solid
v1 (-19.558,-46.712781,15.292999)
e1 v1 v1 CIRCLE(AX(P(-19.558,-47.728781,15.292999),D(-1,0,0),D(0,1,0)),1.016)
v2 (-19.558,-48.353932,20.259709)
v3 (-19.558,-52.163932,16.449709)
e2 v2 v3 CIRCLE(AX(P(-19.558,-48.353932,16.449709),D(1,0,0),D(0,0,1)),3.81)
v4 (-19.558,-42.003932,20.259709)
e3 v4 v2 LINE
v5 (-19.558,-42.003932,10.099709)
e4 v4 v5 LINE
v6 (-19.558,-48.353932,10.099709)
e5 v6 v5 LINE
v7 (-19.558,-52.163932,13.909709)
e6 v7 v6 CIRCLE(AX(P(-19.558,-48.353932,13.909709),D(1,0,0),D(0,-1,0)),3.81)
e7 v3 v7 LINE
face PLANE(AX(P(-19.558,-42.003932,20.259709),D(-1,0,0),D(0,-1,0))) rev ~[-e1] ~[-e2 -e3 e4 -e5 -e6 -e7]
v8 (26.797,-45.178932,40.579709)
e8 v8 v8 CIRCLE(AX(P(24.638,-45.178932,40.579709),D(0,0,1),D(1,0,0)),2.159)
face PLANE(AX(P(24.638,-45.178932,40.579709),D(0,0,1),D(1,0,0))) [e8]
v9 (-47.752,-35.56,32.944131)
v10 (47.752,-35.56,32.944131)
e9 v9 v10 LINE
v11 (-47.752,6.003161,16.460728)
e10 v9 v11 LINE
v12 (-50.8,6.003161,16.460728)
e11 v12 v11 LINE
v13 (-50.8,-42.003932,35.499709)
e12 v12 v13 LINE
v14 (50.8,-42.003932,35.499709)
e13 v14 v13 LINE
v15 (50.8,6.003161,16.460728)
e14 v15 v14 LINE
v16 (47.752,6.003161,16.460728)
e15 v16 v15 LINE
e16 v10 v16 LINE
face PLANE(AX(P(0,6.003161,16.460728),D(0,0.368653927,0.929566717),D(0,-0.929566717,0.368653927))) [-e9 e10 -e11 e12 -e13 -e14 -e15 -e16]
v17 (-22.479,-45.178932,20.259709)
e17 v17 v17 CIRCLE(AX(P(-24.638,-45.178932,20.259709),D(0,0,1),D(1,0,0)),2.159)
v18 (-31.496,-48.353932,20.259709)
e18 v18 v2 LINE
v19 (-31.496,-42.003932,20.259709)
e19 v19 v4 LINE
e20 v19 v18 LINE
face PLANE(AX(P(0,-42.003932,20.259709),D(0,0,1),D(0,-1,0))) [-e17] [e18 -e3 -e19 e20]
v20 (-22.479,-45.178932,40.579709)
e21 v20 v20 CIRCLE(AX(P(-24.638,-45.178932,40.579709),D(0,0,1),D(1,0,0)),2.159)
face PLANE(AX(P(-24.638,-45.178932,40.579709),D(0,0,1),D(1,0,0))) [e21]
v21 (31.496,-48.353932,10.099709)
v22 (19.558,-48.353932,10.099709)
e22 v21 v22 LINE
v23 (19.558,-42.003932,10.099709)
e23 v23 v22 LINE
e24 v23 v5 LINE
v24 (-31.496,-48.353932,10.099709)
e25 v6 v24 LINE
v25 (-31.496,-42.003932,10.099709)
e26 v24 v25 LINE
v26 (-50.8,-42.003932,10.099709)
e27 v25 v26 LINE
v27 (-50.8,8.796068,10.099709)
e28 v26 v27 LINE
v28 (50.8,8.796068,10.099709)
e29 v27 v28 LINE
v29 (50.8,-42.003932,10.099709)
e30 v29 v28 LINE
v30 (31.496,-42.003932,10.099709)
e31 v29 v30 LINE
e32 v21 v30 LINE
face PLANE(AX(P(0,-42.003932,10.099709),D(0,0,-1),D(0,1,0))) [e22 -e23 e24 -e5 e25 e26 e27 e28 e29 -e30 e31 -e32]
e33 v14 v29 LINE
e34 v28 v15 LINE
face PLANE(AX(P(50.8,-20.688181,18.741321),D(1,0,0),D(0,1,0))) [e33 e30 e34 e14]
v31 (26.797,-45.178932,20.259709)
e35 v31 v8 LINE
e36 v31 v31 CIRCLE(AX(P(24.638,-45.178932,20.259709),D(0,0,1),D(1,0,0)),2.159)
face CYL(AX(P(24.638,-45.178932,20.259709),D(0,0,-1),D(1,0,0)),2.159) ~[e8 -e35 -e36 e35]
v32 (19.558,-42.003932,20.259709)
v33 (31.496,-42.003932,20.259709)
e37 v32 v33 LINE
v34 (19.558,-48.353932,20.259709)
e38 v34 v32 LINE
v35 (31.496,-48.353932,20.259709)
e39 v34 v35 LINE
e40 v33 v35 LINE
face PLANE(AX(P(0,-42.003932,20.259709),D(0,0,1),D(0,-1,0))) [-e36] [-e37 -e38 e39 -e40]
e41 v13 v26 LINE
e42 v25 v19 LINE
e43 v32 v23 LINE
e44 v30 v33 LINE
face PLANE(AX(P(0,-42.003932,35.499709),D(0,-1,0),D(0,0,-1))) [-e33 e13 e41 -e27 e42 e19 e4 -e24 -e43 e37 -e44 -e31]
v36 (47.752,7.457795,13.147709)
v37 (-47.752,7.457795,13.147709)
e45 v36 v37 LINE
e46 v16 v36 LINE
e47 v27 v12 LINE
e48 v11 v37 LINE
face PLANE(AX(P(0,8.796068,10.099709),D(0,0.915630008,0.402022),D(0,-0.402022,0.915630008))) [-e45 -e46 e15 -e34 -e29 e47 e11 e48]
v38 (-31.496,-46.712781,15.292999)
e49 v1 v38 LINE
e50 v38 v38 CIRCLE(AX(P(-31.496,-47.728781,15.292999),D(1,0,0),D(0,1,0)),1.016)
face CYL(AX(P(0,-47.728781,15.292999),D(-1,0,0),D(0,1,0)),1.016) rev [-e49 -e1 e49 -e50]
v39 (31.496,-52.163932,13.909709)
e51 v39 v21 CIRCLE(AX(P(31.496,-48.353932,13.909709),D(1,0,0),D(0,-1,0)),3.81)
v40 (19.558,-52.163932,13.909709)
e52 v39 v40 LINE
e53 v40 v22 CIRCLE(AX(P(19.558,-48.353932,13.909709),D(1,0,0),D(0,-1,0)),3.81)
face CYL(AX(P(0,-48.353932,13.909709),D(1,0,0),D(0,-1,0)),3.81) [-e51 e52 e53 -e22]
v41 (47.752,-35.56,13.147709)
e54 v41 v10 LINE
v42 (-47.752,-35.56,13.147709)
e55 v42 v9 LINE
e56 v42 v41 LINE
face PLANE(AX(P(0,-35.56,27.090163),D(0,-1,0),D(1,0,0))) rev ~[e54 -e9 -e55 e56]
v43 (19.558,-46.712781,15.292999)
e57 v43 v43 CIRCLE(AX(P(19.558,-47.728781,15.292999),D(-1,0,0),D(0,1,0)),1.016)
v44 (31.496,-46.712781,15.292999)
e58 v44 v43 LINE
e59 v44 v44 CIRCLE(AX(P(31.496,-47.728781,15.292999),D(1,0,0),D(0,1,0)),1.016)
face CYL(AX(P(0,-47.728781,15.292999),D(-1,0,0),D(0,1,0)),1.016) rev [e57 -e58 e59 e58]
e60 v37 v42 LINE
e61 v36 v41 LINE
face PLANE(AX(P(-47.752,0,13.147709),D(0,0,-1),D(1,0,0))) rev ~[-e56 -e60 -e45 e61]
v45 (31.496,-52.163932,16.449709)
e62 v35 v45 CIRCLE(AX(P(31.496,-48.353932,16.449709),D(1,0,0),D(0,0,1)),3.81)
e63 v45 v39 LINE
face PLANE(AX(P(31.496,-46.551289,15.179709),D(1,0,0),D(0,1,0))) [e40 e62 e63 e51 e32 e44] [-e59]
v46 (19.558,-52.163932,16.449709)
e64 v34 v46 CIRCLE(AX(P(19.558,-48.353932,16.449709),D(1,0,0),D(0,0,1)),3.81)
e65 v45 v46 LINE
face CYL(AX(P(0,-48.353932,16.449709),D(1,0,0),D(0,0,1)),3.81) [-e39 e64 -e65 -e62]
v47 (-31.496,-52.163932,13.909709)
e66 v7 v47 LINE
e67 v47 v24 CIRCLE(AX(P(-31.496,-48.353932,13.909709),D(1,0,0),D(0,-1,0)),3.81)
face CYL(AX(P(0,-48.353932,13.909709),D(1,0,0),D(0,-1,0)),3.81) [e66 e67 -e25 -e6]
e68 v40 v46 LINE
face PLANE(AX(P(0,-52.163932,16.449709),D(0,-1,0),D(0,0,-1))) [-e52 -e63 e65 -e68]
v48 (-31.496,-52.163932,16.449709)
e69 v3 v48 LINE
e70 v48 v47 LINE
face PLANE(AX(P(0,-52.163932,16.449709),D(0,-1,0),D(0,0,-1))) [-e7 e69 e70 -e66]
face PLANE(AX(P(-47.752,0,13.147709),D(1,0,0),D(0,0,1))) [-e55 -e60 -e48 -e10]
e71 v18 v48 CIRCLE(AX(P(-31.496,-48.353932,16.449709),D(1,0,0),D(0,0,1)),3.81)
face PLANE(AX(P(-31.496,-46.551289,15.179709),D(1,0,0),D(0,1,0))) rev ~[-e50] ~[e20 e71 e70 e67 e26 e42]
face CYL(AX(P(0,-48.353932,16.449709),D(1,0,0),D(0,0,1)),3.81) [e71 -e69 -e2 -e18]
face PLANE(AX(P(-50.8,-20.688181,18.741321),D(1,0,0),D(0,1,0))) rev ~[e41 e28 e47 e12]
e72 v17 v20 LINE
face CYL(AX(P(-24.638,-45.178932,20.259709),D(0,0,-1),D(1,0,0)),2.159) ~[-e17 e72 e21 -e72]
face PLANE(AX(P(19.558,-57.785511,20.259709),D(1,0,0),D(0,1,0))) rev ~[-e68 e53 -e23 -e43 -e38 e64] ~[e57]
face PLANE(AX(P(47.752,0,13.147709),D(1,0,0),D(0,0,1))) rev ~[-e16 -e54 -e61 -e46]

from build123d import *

# Parameters (mm, degrees)
F1_DEPTH = 50.8
F0_R     = 1.016
F2_DEPTH = 31.496
F3_R     = 2.159
F4_DEPTH = 20.32
F3_W     = 39.116
F3_H     = 6.35
F3_H_2   = 9.431579427
F5_DEPTH = 25.4
F6_W     = 95.504
F6_H     = 27.8849071284
F7_DEPTH = 35.56


with BuildPart() as f1:
    # F0 (on Right) → F1 (new body, symmetric)
    with BuildSketch(Plane.YZ):
        Polygon((-42.0039315899, 10.0997092374), (-35.6157857536, 10.0997092374), (8.7960684101, 10.0997092374), (6.0031614266, 16.4607279003), (-42.0039315899, 35.4997092374), (-42.0039315899, 20.2597092374), align=None)
    extrude(amount=F1_DEPTH, both=True)

    # F0 (on Right) → F2 (join, symmetric)
    with BuildSketch(Plane.YZ):
        with BuildLine():
            Line((-48.3539315899, 10.0997092374), (-42.0039315899, 10.0997092374))
            Line((-42.0039315899, 10.0997092374), (-42.0039315899, 20.2597092374))
            Line((-42.0039315899, 20.2597092374), (-48.3539315899, 20.2597092374))
            ThreePointArc((-48.3539315899, 20.2597092374), (-51.0480084262, 19.1437860737), (-52.1639315899, 16.4497092374))
            Line((-52.1639315899, 16.4497092374), (-52.1639315899, 13.9097092374))
            ThreePointArc((-52.1639315899, 13.9097092374), (-51.0480084262, 11.215632401), (-48.3539315899, 10.0997092374))
        make_face()
        with Locations((-47.7287806571, 15.2929993346)):
            Circle(F0_R, mode=Mode.SUBTRACT)
    extrude(amount=F2_DEPTH, both=True)

    # F3 (on face) → F4 (join)
    with BuildSketch(Plane.XY.offset(20.2597092374)):
        with Locations((-24.638, -45.1789315899)):
            Circle(F3_R)
        with Locations((24.638, -45.1789315899)):
            Circle(F3_R)
    extrude(amount=F4_DEPTH)

    # F3 (on face) → F5 (cut)
    with BuildSketch(Plane.XY.offset(20.2597092374)):
        with Locations((0, -45.1789315899)):
            Rectangle(F3_W, F3_H)
        with Locations((0, -53.0697213034)):
            Rectangle(F3_W, F3_H_2)
    extrude(amount=-F5_DEPTH, mode=Mode.SUBTRACT)

    # F6 (on Front) → F7 (cut, symmetric)
    with BuildSketch(Plane.XZ):
        with Locations((0, 27.0901628016)):
            Rectangle(F6_W, F6_H)
    extrude(amount=F7_DEPTH, both=True, mode=Mode.SUBTRACT)


solid = f1.part
